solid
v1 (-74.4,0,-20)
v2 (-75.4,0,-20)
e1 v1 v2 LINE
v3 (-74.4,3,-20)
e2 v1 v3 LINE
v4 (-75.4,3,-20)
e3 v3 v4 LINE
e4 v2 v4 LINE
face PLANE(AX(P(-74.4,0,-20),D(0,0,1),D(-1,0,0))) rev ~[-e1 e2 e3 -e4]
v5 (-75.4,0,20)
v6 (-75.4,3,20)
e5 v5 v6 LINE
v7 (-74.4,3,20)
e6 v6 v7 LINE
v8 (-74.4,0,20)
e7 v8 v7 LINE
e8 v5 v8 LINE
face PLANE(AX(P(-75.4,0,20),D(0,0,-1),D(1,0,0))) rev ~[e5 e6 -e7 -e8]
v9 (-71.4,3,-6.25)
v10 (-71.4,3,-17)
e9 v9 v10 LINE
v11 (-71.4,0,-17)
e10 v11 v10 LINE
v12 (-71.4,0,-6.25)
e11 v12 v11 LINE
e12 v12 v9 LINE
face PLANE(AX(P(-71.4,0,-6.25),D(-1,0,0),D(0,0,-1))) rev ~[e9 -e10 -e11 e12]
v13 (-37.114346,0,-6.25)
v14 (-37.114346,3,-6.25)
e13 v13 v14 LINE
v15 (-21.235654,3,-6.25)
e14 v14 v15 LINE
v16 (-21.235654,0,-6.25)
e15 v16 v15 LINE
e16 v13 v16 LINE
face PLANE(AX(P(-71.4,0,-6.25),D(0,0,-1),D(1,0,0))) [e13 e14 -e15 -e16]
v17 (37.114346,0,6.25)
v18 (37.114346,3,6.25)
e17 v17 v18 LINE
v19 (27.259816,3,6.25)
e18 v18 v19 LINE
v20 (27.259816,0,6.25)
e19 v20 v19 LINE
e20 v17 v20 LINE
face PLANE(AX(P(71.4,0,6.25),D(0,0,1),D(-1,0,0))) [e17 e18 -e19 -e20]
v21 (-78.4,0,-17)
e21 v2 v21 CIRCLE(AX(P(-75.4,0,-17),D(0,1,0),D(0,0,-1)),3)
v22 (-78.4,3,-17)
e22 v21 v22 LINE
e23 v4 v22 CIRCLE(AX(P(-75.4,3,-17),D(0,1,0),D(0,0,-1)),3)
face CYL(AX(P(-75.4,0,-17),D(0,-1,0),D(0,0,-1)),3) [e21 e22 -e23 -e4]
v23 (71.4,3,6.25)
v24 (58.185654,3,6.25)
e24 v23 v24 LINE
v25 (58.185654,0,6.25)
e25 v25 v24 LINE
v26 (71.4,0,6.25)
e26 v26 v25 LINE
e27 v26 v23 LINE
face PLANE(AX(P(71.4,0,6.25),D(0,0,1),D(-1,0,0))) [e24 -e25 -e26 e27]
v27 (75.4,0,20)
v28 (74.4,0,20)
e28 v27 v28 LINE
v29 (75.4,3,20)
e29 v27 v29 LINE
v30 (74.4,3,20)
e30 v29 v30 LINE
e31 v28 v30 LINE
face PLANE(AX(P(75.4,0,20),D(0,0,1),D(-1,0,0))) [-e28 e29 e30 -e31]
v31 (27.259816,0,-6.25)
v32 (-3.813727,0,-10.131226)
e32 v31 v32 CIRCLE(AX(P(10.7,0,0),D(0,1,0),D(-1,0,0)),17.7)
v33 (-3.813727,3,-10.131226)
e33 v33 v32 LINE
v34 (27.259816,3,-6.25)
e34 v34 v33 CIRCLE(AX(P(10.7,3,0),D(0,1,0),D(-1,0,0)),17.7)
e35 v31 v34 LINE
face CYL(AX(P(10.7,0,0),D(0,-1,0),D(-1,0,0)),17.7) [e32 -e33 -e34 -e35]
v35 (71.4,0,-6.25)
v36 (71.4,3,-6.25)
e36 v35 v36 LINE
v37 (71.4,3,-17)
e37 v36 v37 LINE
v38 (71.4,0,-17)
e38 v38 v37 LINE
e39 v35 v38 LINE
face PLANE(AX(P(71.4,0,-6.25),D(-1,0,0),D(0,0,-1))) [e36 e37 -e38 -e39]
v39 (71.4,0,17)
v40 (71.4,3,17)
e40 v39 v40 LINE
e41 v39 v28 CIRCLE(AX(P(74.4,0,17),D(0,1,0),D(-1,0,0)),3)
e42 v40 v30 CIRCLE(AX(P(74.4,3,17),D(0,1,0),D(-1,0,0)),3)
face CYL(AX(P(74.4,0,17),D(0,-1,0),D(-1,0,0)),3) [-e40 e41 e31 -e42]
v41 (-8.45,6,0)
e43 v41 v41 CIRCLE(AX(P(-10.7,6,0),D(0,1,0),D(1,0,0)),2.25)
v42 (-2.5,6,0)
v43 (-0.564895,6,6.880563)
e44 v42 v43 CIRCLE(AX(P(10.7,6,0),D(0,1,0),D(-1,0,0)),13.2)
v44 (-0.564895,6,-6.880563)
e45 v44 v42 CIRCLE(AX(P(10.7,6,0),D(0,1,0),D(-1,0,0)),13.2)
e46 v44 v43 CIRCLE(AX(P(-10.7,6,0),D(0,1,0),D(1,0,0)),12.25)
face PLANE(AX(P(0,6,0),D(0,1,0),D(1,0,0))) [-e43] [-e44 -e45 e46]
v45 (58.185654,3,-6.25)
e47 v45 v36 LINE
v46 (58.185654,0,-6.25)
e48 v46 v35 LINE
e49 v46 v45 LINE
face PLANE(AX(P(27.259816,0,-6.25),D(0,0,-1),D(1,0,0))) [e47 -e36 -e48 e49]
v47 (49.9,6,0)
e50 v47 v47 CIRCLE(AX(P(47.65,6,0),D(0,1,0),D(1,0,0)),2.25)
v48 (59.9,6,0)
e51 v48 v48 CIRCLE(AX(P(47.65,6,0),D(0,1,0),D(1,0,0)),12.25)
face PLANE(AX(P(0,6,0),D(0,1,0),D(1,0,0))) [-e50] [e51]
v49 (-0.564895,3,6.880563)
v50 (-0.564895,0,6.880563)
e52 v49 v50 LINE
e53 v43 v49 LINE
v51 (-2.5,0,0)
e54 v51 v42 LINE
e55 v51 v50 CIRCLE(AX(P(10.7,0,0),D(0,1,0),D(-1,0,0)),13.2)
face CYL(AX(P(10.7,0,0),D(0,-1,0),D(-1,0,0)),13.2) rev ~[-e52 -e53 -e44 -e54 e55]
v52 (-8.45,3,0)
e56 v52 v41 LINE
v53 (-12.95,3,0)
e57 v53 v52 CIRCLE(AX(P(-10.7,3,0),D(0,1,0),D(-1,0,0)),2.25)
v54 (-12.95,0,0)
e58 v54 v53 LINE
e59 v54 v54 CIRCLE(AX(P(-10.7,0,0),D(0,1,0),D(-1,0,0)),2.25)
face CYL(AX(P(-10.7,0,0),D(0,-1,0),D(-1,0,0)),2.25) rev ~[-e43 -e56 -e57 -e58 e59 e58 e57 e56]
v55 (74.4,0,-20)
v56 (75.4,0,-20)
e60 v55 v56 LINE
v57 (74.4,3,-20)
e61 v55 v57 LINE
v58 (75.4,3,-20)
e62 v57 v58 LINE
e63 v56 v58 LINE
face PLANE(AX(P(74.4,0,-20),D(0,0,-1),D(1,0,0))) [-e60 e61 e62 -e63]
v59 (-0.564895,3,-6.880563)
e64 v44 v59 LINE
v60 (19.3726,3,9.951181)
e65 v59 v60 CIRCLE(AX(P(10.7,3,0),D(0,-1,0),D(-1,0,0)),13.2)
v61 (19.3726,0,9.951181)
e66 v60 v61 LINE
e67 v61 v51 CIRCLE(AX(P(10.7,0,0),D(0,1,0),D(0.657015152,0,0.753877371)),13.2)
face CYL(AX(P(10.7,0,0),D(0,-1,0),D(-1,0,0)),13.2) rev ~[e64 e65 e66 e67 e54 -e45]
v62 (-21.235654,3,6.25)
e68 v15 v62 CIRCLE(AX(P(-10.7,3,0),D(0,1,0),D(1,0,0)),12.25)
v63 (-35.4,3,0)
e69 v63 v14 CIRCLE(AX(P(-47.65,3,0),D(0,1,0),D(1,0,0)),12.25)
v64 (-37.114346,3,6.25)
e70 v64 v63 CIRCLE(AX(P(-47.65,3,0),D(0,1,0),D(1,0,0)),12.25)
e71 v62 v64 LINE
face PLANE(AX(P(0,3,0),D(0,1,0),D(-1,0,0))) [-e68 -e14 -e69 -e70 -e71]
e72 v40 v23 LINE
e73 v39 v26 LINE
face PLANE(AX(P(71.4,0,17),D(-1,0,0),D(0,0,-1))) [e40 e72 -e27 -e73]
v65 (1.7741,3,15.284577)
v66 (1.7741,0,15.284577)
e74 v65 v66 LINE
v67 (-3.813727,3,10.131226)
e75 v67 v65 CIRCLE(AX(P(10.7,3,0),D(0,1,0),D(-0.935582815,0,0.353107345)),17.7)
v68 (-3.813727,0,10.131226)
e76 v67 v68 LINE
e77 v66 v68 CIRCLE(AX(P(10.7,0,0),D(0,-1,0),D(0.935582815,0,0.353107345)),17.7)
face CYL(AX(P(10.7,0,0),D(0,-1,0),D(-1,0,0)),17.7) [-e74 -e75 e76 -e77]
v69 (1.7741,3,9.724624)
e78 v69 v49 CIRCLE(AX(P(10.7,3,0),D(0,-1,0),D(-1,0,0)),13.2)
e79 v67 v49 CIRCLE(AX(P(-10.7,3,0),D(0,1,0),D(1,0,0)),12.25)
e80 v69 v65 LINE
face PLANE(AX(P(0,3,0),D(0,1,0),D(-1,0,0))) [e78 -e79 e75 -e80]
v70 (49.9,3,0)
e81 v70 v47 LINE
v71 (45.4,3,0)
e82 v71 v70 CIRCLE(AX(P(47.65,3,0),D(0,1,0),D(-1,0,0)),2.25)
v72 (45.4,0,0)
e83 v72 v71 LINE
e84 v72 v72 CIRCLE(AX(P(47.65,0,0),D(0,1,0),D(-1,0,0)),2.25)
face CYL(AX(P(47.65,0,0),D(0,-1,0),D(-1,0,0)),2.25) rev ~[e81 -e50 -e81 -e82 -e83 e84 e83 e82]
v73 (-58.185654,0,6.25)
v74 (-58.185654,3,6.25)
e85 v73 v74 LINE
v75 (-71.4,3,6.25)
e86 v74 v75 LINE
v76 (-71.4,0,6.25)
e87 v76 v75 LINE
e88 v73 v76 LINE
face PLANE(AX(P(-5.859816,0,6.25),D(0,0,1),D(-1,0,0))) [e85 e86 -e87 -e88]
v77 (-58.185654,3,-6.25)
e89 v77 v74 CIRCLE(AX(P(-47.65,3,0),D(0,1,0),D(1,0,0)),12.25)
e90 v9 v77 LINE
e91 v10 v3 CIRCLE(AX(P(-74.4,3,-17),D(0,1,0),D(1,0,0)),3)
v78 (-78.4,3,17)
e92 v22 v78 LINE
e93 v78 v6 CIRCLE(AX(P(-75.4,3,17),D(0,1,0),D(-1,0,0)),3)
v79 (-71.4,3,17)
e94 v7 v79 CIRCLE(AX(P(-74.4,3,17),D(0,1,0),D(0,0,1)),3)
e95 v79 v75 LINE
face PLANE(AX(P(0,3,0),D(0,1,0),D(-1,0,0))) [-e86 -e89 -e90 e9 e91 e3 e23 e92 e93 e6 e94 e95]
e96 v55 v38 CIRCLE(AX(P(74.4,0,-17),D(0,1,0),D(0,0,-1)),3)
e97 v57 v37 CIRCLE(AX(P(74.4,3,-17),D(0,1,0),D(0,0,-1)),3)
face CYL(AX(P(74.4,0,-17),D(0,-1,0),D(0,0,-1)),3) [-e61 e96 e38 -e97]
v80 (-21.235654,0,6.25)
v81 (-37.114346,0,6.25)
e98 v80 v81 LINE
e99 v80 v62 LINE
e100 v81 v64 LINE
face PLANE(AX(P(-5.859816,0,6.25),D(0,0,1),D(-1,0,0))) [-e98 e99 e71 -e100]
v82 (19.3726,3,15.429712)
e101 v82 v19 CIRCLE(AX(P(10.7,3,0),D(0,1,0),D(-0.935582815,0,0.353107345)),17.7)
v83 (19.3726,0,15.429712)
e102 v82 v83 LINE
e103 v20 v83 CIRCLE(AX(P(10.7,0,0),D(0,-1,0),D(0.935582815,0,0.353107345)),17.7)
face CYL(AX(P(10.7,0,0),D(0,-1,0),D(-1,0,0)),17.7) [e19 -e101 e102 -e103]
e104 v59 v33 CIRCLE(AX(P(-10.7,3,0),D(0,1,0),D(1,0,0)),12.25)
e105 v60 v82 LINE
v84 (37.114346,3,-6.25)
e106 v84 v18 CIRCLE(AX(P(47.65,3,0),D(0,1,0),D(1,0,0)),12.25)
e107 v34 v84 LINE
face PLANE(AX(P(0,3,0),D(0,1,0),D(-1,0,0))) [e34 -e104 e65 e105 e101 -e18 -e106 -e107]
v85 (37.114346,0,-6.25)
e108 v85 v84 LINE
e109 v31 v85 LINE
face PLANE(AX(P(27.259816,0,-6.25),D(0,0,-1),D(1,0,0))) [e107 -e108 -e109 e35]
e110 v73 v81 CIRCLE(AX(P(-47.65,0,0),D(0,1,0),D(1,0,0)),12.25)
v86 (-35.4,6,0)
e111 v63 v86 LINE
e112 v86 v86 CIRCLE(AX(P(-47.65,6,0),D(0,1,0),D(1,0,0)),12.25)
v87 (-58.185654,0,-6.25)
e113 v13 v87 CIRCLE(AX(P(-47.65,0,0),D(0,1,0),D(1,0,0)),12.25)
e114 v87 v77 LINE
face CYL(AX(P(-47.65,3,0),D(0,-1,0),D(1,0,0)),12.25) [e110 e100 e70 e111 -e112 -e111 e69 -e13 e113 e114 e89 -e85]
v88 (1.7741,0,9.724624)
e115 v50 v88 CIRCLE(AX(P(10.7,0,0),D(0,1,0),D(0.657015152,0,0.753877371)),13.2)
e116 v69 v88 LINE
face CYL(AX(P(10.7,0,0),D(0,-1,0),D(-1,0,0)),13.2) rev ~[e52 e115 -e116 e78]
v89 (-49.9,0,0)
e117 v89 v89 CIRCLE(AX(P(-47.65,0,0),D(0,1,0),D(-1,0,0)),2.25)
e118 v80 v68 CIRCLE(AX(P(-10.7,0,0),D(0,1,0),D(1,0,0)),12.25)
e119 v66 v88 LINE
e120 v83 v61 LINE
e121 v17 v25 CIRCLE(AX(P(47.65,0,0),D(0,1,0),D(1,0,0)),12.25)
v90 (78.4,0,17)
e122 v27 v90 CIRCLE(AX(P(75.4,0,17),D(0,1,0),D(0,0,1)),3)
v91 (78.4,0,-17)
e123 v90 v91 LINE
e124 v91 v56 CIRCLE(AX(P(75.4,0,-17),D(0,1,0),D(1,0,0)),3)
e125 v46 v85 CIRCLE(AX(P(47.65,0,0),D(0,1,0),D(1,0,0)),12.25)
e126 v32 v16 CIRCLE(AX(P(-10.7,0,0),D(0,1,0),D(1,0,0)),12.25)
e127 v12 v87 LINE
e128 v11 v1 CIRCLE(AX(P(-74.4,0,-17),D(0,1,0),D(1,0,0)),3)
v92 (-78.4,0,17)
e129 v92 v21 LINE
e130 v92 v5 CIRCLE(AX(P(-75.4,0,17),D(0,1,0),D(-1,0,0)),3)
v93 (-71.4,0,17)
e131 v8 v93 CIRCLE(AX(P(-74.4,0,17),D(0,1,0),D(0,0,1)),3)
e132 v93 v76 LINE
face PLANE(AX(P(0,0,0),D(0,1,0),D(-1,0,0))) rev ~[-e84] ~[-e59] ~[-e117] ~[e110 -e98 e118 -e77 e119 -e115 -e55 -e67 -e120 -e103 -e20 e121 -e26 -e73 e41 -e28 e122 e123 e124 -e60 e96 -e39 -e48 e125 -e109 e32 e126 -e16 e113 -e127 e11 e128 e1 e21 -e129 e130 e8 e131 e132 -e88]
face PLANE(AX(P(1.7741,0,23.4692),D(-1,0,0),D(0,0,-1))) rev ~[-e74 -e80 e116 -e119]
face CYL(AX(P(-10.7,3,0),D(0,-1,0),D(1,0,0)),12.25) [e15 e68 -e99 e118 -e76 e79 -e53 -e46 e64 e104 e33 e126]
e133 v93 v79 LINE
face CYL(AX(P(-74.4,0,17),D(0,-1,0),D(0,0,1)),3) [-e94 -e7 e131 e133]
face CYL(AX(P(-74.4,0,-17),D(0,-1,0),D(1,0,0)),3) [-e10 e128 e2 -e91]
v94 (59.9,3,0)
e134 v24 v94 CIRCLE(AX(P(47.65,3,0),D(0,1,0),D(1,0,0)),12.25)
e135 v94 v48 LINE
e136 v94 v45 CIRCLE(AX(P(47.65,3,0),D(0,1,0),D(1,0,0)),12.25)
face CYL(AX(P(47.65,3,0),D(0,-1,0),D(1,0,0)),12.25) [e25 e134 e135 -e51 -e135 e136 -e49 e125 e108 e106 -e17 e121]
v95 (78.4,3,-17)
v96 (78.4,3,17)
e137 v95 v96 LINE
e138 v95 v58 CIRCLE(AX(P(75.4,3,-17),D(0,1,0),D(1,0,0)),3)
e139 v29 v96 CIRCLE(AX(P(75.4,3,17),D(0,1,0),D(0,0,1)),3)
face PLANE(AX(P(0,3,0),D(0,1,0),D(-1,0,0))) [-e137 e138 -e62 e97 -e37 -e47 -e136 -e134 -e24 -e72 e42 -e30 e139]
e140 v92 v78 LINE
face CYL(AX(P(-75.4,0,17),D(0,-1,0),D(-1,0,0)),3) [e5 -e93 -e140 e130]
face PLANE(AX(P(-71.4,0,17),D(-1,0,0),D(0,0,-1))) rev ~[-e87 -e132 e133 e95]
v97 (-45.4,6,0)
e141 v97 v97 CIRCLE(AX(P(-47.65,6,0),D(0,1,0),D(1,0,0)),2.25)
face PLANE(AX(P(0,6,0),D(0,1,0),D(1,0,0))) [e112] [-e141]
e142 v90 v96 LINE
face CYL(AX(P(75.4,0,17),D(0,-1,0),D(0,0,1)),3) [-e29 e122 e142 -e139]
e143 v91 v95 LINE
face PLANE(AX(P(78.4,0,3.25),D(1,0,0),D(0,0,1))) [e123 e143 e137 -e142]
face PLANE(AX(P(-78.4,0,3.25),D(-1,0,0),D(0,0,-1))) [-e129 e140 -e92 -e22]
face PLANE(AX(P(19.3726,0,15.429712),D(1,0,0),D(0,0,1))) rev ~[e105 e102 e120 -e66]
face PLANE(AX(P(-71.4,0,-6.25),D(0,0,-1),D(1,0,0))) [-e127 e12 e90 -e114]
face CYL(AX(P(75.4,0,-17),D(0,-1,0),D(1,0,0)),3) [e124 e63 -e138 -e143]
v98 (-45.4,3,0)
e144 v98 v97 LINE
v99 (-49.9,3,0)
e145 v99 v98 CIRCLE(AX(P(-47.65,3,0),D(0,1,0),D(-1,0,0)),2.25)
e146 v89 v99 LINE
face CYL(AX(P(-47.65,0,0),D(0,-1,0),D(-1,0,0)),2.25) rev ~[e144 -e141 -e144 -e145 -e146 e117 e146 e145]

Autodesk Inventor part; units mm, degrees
ref_plane "YZ Plane" through (0, 0, 0) normal (1, 0, 0) x (0, 1, 0)
ref_plane "XZ Plane" through (0, 0, 0) normal (0, 1, 0) x (-1, 0, 0)
ref_plane "XY Plane" through (0, 0, 0) normal (0, 0, 1) x (1, 0, 0)
sketch "Sketch1" plane through (0, 0, 0) normal (0, 1, 0) x (-1, 0, 0)
  line L0 (-75.4, 6.25) -> (75.4, 6.25)
  line L1 (78.4, 3.25) -> (78.4, -3.25)
  line L2 (75.4, -6.25) -> (-75.4, -6.25)
  line L3 (-78.4, -3.25) -> (-78.4, 3.25)
  circle A0 centre (-47.65, 0) radius 2.25
  circle A1 centre (47.65, 0) radius 2.25
  circle A2 centre (-47.65, 0) radius 26.75 construction
  circle A3 centre (-10.7, 0) radius 1.7
  circle A4 centre (-10.7, 0) radius 11.2 construction
  line L4 (-21.9, 0) -> (-21.9, 5.3604)
  line L5 (-20.9, 0) -> (-20.9, 5.3604)
  circle A5 centre (10.7, 0) radius 2.25
  circle A6 centre (10.7, 0) radius 11.2 construction
  line L6 (-0.5, 0) -> (-0.5, 4.194)
  line L7 (0.5, 0) -> (0.5, 4.194)
  circle A7 centre (47.65, 0) radius 26.75 construction
  line L8 (20.9, 0) -> (20.9, 4.3426)
  line L9 (21.9, 0) -> (21.9, 4.3426)
  arc A8 (-75.4, 6.25) -> (-78.4, 3.25) centre (-75.4, 3.25) ccw
  arc A9 (-78.4, -3.25) -> (-75.4, -6.25) centre (-75.4, -3.25) ccw
  arc A10 (78.4, 3.25) -> (75.4, 6.25) centre (75.4, 3.25) ccw
  arc A11 (75.4, -6.25) -> (78.4, -3.25) centre (75.4, -3.25) ccw
  line L10 (-81.9483, 0) -> (78.4, 0) construction
  circle A12 centre (-10.7, 0) radius 13.2
  circle A13 centre (-10.7, 0) radius 17.7
  line L11 (74.4, 0) -> (74.4, 11.2)
  line L12 (-74.4, 0) -> (-74.4, 10)
  line L13 (-75.4, 20) -> (-74.4, 20)
  line L14 (-71.4, 17) -> (-71.4, -17)
  line L15 (-74.4, -20) -> (-75.4, -20)
  line L16 (-78.4, -17) -> (-78.4, 17)
  line L17 (75.4, 20) -> (74.4, 20)
  line L18 (71.4, 17) -> (71.4, -17)
  line L19 (74.4, -20) -> (75.4, -20)
  line L20 (78.4, -17) -> (78.4, 17)
  arc A14 (74.4, 20) -> (71.4, 17) centre (74.4, 17) ccw
  arc A15 (78.4, 17) -> (75.4, 20) centre (75.4, 17) ccw
  arc A16 (75.4, -20) -> (78.4, -17) centre (75.4, -17) ccw
  arc A17 (71.4, -17) -> (74.4, -20) centre (74.4, -17) ccw
  arc A18 (-75.4, 20) -> (-78.4, 17) centre (-75.4, 17) ccw
  arc A19 (-71.4, 17) -> (-74.4, 20) centre (-74.4, 17) ccw
  arc A20 (-74.4, -20) -> (-71.4, -17) centre (-74.4, -17) ccw
  arc A21 (-78.4, -17) -> (-75.4, -20) centre (-75.4, -17) ccw
  line L21 (-19.3726, 23.4692) -> (-1.7741, 23.4692)
  line L22 (-1.7741, 23.4692) -> (-1.7741, 7.4894)
  line L23 (-1.7741, 7.4894) -> (-19.3726, 7.4894)
  line L24 (-19.3726, 7.4894) -> (-19.3726, 23.4692)
  point P0 (0, 0)
  point P1 (-78.4, 6.25)
  point P2 (-78.4, -6.25)
  point P3 (0, 6.25)
  point P4 (-78.4, 20)
  point P5 (-71.4, 20)
  point P6 (-78.4, -20)
  point P7 (-78.4, 0)
  point P8 (-78.4, 0)
  point P9 (78.4, 20)
  point P10 (71.4, 20)
  point P11 (78.4, -20)
  point P12 (78.4, 0)
  dimension "d0" = 12.5
  dimension "d1" = 4.5
  dimension "d3" = 4.5
  dimension "d5" = 53.5
  dimension "d6" = 3.4
  dimension "d7" = 22.4
  dimension "d8" = 1
  dimension "d9" = 4.5
  dimension "d10" = 22.4
  dimension "d11" = 1
  dimension "d12" = 53.5
  dimension "d13" = 1
  dimension "d14" = 3
  dimension "d23" = 4.5
  dimension "d26" = 4
  dimension "d27" = 4
  dimension "d28" = 7
  dimension "d29" = 40
  dimension "d30" = 7
  dimension "d31" = 40
  dimension "d32" = 3
  dimension "d33" = 3
  dimension "d39" = 2
extrude "Extrusion1" add sketch "Sketch1" along normal blind 3 contours A8 L16 A18 L13 A19 L14 L0 | L0 L14 L2 A9 L3 A8 | L0 A13 L2 L14 | A9 L2 L14 A20 L15 A21 L16 | A13 L24 A12 L0 | L0 A12 L2 A13 | A13 L22 A12 L24 | L2 A12 A13 | A12 L22 A13 L0 | L0 A13 L2 A12 | A13 L0 L18 L2 | L18 L0 A10 L1 A11 L2 | L2 A11 L20 A16 L19 A17 L18 | L18 A14 L17 A15 L20 A10 L0
extrude "Extrusion2" cut sketch "Sketch1" along normal blind 10 contours A12 L24 L23 L22 L0 | L0 A12 L2 | A12 L22 L23 L24 | L2 A12
sketch "Sketch2" plane through (0, 3, 0) normal (0, 1, 0) x (1, 0, 0)
  circle A0 centre (47.65, 0) radius 2.25 projected
  circle A1 centre (-10.7, 0) radius 2.25 projected
  circle A2 centre (-47.65, 0) radius 2.25 projected
  circle A3 centre (-47.65, 0) radius 12.25
  circle A4 centre (-10.7, 0) radius 12.25
  circle A5 centre (47.65, 0) radius 12.25
  point P0 (0, 0)
  dimension "d34" = 10
  dimension "d35" = 10
  dimension "d36" = 10
extrude "Extrusion3" add sketch "Sketch2" along normal blind 3
extrude "Extrusion4" cut sketch "Sketch1" along normal blind 3 contours L24 L21 L22 A13 | A13 L22 A12 L24 | A12 L22 L23 L24
extrude "Extrusion5" add sketch "Sketch2" against normal blind 3
extrude "Extrusion6" cut sketch "Sketch1" along normal mid plane 20 contours A12 L24 L23 L22 L0 | L0 A12 L2 | A12 L22 L23 L24 | L2 A12
equation "\"sp\" = 0.4"
properties part number "OuterBar"
